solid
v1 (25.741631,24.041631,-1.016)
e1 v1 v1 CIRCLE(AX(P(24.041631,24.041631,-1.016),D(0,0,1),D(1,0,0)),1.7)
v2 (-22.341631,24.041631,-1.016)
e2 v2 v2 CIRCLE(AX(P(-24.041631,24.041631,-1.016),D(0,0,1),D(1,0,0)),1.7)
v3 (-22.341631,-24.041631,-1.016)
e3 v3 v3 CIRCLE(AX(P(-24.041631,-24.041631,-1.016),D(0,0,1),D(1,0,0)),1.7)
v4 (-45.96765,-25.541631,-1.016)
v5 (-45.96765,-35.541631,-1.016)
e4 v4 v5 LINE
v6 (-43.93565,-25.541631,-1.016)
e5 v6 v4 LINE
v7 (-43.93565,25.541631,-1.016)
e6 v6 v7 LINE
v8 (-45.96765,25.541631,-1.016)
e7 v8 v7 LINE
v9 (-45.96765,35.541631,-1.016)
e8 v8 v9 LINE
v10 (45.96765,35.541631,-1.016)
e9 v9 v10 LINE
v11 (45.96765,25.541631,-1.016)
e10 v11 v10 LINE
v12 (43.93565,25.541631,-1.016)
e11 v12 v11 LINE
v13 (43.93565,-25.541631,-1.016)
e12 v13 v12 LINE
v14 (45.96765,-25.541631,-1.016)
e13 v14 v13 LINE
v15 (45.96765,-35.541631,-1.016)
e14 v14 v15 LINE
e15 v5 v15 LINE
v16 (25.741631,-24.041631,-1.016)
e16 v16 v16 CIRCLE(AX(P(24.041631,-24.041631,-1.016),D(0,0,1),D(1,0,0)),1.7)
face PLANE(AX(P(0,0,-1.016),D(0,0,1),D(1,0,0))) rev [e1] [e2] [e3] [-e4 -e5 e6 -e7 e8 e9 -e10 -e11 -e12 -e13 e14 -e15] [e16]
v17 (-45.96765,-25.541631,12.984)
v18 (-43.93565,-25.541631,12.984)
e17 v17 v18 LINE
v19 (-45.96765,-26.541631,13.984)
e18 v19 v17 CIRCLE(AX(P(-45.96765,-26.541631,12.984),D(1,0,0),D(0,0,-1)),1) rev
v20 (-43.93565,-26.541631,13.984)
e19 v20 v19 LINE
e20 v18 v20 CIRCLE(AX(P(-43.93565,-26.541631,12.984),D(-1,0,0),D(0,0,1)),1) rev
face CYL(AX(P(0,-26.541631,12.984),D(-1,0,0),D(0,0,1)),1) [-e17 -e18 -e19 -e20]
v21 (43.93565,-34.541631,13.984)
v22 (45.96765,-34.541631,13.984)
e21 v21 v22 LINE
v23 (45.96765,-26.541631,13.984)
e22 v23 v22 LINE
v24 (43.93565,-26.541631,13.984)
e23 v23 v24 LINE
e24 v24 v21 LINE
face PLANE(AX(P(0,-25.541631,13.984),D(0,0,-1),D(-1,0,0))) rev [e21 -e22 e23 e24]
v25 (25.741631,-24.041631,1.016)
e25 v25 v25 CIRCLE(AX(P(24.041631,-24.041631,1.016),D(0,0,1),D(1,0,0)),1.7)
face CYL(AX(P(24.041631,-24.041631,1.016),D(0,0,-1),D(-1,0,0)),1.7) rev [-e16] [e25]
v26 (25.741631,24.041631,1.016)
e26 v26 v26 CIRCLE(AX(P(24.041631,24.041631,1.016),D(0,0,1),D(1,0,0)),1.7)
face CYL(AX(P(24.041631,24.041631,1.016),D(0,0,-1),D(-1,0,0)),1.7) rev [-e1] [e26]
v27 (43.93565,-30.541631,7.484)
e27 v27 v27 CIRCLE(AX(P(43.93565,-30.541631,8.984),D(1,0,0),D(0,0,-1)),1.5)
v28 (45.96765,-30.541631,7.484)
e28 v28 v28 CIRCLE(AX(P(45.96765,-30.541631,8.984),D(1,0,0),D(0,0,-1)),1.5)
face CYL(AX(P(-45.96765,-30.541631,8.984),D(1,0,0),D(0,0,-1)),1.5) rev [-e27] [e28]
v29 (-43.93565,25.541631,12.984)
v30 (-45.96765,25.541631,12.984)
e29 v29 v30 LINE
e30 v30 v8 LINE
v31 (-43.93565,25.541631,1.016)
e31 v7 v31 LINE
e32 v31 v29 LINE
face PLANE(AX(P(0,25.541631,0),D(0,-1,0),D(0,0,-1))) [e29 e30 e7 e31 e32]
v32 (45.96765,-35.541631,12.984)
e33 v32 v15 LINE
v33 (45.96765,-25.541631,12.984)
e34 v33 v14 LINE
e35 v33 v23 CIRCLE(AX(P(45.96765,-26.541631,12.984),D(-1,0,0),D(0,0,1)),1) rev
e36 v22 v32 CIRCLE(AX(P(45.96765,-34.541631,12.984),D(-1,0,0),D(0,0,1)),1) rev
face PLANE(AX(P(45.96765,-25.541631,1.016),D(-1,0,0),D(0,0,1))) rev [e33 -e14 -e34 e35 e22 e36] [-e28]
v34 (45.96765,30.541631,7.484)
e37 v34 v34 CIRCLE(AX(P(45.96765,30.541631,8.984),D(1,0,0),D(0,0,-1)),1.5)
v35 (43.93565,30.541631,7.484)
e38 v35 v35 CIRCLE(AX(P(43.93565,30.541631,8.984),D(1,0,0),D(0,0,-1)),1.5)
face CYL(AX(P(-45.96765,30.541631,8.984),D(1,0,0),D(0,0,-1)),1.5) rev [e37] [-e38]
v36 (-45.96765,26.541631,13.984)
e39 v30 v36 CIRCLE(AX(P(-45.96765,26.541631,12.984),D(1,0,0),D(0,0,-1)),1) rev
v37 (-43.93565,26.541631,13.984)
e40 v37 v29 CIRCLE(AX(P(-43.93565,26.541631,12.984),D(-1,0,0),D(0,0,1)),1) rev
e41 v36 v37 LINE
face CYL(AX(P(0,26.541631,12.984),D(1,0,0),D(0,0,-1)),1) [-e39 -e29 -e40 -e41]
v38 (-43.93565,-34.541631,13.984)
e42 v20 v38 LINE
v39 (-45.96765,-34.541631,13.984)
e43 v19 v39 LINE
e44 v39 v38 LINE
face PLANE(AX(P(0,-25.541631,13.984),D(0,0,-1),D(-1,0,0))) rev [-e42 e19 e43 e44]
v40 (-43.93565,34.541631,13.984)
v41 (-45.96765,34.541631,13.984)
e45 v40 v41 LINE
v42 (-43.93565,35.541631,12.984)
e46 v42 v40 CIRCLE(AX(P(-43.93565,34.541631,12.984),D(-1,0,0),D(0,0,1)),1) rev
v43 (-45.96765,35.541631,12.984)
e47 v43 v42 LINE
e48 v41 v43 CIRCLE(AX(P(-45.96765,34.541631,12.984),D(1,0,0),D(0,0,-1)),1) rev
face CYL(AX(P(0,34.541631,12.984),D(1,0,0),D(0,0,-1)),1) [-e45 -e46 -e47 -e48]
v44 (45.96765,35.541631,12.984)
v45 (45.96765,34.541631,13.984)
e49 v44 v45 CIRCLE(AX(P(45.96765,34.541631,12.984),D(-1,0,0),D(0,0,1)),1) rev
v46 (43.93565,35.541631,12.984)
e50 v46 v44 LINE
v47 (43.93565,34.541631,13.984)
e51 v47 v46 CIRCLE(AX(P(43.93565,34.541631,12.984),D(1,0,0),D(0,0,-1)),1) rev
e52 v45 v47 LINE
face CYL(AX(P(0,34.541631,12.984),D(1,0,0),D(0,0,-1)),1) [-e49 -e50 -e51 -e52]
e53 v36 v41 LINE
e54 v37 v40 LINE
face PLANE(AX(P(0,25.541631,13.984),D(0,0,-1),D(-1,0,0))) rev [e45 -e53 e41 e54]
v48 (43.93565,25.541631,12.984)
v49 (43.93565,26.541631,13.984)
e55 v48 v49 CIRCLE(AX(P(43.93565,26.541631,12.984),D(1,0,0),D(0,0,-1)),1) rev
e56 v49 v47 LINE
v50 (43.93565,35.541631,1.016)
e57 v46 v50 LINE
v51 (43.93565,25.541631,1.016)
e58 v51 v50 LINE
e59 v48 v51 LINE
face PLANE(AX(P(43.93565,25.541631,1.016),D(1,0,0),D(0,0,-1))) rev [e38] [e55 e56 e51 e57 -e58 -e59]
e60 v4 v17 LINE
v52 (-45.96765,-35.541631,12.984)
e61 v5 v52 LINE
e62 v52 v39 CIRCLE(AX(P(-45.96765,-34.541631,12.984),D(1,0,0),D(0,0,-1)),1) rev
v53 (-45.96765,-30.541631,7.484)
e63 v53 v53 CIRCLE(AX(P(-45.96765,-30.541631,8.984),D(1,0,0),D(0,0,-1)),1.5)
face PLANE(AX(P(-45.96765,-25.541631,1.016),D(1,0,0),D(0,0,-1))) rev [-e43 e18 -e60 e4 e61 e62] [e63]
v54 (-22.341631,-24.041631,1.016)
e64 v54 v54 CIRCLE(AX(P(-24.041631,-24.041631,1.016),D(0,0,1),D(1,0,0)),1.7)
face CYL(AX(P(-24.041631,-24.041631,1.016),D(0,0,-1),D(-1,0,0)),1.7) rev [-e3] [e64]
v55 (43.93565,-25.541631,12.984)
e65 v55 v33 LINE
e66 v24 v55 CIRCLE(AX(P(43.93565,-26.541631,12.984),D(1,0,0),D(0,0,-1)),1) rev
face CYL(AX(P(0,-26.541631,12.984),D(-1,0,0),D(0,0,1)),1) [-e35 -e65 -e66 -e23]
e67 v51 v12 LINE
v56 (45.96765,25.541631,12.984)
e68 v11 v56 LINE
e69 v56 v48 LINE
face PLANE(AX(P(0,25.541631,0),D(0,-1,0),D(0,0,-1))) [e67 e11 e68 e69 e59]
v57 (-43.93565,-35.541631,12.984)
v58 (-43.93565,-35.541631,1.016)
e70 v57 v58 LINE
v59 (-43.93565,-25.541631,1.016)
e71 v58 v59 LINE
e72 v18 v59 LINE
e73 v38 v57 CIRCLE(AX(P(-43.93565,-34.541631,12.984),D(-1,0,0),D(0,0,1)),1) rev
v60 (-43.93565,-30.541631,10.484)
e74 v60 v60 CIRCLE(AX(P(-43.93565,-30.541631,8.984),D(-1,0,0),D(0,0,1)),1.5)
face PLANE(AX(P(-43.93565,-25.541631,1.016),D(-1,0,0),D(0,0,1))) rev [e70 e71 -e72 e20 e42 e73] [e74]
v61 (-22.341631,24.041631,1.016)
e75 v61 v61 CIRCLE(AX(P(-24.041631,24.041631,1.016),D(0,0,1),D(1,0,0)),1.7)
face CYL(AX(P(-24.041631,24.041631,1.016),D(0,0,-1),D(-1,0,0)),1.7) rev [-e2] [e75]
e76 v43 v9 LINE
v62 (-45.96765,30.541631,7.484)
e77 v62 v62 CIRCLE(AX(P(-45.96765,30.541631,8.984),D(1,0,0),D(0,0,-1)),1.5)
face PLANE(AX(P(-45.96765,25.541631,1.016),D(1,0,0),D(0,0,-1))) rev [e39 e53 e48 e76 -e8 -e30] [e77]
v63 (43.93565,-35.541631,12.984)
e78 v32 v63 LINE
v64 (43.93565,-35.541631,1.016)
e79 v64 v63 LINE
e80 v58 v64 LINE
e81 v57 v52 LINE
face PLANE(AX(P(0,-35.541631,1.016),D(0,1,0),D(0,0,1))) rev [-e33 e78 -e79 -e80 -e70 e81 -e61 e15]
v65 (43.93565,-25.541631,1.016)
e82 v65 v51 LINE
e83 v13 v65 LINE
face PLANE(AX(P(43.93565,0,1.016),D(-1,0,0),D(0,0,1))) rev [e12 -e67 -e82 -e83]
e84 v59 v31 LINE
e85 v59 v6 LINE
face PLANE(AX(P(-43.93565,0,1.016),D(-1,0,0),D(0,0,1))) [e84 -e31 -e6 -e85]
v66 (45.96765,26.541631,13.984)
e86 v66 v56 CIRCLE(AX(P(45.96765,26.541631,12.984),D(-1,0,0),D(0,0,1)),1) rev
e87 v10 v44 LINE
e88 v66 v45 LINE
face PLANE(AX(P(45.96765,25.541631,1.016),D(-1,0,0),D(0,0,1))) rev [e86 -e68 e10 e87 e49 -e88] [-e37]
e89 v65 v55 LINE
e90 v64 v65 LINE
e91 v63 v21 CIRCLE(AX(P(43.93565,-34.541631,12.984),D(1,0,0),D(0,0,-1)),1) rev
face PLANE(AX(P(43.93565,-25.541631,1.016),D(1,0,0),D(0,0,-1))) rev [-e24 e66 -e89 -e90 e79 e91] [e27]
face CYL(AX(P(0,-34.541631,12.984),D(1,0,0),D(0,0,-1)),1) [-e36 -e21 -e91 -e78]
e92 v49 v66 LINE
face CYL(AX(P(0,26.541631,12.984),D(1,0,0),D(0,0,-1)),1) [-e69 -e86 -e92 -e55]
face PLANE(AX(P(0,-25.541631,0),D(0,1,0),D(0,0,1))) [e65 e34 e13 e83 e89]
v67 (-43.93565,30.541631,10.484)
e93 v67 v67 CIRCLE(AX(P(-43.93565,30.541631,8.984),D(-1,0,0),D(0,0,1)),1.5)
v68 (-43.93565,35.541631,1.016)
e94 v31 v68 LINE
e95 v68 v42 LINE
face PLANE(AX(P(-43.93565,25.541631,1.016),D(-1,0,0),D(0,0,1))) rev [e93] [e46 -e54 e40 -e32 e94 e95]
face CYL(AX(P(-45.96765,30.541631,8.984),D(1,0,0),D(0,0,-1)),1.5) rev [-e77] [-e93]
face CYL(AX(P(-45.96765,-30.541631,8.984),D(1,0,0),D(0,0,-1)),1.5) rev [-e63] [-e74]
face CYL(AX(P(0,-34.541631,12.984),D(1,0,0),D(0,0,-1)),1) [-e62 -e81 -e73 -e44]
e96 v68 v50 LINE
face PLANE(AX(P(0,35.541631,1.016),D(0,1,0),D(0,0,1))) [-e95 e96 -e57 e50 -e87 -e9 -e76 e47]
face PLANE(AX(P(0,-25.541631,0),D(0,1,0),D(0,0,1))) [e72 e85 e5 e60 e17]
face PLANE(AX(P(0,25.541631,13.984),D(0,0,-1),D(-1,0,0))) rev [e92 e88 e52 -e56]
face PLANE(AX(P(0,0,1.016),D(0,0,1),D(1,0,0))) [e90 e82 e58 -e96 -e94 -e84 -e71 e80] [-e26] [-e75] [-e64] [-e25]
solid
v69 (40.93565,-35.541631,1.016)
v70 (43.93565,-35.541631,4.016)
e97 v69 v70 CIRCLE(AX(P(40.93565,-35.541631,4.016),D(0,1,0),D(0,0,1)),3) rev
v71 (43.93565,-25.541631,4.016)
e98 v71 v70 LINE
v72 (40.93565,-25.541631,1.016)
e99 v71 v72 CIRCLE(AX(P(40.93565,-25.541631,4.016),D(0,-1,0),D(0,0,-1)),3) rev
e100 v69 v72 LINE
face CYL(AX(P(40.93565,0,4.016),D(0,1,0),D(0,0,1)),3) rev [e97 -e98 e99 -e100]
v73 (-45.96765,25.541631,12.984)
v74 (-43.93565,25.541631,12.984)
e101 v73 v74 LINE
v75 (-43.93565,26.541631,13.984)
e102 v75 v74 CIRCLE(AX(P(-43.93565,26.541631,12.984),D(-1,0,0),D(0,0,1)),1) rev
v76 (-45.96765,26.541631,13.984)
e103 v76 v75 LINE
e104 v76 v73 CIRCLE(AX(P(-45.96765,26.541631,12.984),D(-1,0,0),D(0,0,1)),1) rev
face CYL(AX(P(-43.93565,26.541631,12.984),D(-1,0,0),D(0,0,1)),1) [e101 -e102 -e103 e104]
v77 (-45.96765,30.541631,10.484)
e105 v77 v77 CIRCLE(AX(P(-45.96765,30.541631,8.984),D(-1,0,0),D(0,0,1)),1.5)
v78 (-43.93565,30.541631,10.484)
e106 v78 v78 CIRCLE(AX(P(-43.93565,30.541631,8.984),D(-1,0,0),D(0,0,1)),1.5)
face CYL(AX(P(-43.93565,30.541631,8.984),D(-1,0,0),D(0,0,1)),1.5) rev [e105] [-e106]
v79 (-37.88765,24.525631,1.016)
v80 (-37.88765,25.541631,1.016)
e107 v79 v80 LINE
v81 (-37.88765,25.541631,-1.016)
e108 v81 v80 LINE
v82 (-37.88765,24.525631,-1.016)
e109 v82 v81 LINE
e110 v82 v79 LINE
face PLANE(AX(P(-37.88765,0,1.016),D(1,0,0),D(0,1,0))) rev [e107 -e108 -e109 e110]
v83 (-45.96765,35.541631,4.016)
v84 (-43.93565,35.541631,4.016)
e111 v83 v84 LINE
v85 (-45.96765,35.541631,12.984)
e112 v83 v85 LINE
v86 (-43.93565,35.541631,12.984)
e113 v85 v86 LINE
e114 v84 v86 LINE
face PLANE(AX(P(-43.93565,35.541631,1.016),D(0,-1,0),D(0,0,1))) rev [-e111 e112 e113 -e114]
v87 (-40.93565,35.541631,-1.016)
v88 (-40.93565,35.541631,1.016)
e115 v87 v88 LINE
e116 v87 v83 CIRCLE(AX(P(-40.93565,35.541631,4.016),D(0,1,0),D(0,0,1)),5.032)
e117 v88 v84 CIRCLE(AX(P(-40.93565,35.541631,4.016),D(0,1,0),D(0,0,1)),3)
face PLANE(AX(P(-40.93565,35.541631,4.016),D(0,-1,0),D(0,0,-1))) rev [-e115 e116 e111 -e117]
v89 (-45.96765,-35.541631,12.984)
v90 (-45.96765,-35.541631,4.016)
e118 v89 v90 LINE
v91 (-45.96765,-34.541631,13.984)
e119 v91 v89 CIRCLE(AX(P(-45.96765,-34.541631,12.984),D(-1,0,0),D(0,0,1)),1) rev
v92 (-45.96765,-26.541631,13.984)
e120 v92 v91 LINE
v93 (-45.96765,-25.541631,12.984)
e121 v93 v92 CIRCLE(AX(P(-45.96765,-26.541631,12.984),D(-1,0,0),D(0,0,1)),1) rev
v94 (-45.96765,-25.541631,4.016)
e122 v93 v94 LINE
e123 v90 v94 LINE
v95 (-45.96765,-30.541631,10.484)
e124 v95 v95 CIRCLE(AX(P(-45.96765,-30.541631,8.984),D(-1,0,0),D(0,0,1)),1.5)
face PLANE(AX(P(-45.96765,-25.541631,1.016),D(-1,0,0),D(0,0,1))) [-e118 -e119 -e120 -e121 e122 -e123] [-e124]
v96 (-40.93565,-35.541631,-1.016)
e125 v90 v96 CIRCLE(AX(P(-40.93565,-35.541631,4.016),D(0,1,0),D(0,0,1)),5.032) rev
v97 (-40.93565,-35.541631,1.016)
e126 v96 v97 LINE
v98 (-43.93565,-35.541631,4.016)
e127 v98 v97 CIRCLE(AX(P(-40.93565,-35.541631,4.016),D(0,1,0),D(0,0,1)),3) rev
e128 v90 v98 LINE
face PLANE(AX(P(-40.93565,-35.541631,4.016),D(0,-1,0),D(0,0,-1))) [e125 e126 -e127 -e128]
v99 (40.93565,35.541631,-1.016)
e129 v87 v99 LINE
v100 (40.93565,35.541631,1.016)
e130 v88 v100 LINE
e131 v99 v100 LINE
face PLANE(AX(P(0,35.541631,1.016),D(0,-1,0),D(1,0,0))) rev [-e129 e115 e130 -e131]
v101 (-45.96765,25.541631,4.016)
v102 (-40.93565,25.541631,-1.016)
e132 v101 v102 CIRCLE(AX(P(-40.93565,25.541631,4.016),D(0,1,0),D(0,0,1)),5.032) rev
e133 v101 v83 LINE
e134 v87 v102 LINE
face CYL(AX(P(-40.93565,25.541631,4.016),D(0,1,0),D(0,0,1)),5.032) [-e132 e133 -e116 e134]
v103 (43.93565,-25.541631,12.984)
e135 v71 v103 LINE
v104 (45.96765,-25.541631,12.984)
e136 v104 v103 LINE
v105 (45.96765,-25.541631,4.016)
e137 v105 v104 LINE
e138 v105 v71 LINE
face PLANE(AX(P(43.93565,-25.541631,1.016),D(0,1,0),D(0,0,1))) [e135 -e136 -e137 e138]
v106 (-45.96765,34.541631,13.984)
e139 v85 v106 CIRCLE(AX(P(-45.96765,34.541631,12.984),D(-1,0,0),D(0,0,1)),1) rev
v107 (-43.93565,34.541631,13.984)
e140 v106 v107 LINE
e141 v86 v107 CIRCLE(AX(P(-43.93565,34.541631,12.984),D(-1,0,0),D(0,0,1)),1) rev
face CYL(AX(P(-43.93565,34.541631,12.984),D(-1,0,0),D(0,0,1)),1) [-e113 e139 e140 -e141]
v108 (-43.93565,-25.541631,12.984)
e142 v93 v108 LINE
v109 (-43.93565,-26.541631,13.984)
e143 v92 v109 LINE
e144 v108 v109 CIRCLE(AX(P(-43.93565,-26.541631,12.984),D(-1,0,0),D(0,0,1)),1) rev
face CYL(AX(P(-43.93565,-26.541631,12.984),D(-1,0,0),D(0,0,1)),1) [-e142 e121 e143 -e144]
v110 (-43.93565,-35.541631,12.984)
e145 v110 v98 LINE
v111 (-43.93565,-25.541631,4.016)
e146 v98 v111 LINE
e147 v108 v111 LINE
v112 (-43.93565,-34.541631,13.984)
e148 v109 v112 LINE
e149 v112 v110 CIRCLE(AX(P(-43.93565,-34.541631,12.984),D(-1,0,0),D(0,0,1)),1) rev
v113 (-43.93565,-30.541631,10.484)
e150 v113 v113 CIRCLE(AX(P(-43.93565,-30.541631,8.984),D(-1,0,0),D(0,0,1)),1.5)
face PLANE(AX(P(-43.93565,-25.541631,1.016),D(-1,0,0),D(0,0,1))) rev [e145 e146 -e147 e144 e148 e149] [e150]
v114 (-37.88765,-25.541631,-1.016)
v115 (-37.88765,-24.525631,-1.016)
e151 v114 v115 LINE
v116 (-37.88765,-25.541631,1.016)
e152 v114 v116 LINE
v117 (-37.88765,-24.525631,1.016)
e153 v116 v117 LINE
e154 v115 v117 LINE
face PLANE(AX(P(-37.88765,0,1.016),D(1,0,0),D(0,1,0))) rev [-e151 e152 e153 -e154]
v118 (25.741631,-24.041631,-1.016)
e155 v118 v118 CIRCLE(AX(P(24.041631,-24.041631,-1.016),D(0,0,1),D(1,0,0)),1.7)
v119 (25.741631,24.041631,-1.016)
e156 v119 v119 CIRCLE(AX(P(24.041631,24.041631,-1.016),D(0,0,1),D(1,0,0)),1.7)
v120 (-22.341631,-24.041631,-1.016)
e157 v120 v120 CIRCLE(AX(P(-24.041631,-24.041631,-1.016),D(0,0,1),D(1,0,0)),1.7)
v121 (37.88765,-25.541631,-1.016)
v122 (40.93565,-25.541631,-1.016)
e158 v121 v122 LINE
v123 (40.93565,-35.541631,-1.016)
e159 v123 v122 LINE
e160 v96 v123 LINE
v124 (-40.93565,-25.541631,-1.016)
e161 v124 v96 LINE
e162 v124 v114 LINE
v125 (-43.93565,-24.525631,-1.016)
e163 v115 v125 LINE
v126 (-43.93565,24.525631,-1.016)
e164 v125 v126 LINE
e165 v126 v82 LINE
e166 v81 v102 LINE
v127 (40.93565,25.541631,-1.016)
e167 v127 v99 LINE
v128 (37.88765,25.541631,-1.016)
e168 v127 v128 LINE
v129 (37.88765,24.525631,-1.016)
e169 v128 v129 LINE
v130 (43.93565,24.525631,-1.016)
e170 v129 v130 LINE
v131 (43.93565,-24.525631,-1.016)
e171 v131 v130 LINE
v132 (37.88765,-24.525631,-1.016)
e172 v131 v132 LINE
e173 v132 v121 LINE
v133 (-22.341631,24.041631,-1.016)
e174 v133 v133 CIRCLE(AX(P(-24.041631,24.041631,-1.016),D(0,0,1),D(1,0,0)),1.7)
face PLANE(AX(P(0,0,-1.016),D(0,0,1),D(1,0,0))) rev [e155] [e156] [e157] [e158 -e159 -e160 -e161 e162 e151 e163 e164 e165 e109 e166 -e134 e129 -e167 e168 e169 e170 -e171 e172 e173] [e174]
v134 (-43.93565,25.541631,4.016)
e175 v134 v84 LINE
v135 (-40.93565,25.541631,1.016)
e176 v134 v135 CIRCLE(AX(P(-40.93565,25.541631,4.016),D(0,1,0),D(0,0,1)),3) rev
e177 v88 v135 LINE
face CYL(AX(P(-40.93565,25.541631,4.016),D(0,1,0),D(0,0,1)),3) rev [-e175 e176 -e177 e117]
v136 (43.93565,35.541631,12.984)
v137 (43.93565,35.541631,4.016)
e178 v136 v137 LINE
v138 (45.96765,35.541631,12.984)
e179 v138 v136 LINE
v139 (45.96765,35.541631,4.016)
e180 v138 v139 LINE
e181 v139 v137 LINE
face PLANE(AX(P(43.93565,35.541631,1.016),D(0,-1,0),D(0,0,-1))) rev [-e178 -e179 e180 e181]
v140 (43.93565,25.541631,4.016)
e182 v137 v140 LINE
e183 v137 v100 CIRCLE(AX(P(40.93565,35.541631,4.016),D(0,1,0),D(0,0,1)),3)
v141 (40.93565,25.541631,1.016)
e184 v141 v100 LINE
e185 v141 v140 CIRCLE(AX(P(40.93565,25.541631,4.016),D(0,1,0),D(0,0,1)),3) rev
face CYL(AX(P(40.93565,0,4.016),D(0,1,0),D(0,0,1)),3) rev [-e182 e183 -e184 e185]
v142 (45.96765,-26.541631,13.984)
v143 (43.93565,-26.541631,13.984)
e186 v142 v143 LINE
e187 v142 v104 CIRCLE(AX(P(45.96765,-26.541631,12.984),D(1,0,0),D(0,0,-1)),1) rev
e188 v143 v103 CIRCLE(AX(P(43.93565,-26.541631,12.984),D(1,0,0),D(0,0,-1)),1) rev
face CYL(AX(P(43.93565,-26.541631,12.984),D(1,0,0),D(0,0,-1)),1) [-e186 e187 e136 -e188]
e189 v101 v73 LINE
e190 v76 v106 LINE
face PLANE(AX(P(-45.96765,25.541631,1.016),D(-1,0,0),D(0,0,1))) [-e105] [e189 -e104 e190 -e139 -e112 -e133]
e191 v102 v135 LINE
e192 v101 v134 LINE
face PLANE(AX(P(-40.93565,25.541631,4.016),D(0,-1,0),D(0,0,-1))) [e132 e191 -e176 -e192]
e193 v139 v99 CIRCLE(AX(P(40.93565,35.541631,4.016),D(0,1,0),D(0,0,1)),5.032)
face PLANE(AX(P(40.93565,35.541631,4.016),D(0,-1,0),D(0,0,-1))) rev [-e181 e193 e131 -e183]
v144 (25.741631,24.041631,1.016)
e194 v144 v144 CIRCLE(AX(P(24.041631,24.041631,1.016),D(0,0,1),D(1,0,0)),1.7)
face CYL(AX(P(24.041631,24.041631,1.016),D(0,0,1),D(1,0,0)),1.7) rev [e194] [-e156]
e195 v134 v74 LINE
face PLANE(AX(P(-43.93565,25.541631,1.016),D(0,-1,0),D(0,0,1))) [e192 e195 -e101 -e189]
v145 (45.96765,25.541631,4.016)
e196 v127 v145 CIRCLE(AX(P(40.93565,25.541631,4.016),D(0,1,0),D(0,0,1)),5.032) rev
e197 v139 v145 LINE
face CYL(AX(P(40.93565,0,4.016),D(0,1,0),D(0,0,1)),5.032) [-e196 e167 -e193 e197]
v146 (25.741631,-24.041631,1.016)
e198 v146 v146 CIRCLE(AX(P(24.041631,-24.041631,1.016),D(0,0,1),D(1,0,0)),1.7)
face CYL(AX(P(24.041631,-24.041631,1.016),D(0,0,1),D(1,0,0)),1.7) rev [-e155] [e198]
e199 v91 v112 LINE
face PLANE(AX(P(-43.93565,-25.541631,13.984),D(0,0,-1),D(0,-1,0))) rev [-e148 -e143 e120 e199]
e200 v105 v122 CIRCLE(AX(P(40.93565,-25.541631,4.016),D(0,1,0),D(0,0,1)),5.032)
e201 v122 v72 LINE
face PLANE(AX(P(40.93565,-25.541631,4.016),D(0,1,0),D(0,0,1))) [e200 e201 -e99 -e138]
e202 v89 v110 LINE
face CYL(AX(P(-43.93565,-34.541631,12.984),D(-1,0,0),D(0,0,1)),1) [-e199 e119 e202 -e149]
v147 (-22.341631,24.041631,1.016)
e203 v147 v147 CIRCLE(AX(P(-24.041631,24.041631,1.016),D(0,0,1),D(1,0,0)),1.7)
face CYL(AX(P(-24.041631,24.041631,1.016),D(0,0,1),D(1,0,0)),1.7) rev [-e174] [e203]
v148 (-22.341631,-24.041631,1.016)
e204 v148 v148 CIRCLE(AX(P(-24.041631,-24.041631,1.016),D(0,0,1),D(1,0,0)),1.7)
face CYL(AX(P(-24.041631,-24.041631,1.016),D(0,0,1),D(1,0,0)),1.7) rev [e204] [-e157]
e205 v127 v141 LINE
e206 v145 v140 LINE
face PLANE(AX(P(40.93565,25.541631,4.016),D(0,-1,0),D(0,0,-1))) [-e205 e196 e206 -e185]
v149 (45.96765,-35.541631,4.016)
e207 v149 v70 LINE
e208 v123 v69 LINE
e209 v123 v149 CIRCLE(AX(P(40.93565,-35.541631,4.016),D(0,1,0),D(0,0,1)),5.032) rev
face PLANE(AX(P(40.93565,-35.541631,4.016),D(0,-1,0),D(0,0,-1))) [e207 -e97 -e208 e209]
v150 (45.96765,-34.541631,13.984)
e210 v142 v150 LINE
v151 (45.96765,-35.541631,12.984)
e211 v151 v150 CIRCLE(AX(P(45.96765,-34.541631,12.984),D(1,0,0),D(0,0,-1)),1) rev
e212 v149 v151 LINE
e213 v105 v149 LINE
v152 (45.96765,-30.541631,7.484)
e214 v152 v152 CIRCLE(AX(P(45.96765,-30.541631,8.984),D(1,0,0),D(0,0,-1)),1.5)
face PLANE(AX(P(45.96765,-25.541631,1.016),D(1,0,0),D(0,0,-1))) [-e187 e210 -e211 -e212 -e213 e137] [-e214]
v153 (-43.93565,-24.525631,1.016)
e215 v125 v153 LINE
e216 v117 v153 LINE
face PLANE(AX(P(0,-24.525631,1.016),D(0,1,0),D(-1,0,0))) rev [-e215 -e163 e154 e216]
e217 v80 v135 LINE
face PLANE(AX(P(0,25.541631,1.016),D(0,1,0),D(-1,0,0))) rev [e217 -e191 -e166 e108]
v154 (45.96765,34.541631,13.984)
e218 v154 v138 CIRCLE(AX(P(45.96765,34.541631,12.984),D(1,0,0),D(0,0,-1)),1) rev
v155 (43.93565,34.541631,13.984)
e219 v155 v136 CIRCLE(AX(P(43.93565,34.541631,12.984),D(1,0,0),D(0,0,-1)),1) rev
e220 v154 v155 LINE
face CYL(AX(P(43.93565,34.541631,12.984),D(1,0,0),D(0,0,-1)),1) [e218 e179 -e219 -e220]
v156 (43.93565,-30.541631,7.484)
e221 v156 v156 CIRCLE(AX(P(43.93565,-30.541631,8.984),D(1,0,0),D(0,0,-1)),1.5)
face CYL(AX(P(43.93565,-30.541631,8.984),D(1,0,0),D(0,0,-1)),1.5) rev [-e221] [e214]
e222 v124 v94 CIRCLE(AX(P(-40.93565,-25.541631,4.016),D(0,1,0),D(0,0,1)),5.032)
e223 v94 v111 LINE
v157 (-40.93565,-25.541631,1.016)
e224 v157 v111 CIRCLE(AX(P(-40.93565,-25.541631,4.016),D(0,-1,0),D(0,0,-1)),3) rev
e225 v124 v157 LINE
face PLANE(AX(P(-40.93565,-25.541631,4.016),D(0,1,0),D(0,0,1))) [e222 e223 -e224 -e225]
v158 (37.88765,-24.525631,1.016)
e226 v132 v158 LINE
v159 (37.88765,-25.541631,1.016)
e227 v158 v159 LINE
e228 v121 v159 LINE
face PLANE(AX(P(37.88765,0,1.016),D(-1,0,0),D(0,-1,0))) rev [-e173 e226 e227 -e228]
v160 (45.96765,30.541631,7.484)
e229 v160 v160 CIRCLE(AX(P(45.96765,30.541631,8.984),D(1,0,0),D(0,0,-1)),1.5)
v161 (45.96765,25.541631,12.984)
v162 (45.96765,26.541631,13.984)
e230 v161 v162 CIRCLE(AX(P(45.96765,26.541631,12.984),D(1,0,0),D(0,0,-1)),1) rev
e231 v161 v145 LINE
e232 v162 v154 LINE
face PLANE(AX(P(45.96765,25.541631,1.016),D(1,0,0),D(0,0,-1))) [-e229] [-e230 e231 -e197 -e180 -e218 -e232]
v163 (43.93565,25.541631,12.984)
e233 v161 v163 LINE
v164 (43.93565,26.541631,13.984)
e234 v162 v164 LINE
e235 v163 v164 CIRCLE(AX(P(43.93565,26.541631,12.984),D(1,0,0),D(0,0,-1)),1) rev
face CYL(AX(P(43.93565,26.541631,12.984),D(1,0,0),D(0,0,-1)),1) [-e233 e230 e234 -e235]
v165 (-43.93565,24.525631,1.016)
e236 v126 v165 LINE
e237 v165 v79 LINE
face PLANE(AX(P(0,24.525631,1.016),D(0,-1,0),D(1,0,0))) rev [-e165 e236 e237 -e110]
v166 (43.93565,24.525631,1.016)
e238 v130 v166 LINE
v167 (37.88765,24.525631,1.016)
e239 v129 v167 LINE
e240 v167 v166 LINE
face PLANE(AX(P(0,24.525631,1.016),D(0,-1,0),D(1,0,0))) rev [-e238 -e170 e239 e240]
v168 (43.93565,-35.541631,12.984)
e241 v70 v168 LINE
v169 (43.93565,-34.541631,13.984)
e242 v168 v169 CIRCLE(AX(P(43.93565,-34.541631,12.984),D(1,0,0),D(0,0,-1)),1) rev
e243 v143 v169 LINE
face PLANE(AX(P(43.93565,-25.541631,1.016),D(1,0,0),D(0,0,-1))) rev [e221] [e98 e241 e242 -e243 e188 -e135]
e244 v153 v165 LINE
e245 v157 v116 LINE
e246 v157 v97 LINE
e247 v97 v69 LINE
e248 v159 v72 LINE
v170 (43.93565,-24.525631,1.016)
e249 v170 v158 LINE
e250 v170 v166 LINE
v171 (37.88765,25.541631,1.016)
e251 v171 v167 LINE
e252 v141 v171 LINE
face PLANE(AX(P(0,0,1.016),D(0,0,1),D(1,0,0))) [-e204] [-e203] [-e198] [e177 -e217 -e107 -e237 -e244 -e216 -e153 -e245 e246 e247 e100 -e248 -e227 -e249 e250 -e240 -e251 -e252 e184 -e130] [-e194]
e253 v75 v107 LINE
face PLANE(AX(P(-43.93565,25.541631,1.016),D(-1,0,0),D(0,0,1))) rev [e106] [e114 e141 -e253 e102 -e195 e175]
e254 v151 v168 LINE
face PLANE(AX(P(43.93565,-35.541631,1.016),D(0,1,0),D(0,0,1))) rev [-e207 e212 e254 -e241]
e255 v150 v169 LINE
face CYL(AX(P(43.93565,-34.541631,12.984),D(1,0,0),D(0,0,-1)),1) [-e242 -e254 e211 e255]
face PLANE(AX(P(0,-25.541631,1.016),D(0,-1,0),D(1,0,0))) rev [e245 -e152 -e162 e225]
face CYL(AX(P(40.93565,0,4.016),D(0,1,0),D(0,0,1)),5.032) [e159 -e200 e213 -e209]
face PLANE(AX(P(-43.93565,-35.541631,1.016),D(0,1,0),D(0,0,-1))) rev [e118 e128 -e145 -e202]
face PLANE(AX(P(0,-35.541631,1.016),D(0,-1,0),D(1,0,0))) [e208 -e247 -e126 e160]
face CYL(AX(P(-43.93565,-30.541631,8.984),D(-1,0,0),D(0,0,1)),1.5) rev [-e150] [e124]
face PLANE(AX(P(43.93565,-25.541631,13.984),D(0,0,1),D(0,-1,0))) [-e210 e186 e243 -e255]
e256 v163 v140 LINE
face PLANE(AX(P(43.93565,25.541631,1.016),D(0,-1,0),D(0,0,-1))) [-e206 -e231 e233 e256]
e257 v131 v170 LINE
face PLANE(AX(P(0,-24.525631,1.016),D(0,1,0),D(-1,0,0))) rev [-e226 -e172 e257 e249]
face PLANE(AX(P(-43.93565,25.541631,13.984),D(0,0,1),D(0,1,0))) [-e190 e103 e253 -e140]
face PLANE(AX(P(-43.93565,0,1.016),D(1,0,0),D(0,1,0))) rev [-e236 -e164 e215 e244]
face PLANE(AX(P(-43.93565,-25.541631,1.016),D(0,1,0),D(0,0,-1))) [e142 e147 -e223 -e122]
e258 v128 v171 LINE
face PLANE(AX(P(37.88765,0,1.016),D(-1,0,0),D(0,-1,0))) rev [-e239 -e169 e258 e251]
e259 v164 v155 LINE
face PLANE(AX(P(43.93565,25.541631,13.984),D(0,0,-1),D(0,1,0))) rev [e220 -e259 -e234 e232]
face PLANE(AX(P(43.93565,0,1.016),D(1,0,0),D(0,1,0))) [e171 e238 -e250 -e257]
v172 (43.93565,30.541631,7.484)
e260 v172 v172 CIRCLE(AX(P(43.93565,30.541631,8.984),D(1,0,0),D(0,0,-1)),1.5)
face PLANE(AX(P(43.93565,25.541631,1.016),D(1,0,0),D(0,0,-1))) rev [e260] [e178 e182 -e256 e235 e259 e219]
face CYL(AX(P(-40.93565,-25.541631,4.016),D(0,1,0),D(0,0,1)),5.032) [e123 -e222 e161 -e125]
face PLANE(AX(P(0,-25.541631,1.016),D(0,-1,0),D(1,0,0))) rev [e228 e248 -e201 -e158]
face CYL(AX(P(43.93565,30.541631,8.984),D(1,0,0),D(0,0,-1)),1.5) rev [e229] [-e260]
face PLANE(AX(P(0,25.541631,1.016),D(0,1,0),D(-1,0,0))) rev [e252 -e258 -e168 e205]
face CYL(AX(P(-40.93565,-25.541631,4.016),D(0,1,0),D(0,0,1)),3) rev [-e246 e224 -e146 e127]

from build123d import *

# Parameters (mm, degrees)
SKETCH1_W                  = 87.8713
SKETCH1_H                  = 71.08326112
SKETCH1_R                  = 1.7
BOSS_EXTRUDE1_DEPTH        = 1.016
BOSS_EXTRUDE2_START        = 35.541631
SKETCH2_W                  = 2.032
SKETCH2_H                  = 15
BOSS_EXTRUDE2_DEPTH        = 10
BOSS_EXTRUDE3_START        = -35.541631
SKETCH2_2_W                = 2.032
SKETCH2_2_H                = 15
BOSS_EXTRUDE3_DEPTH        = 10
CUT_EXTRUDE1_DEPTH         = 60.764409448
CUT_EXTRUDE1_DEPTH_BACK    = 60.764409448
SKETCH3_R                  = 1.5
FILLET2_R                  = 1
CONVERT_SOLID3_START       = -43.93565
CONVERT_SOLID3_OUTLINE_W   = 10
CONVERT_SOLID3_OUTLINE_H   = 2.032
CONVERT_SOLID3_OUTLINE_W_2 = 49.05126112
CONVERT_SOLID3_DEPTH       = 87.8713
CONVERT_SOLID3_START_2     = -45.96765
CONVERT_SOLID3_2_OUTLINE_R = 1.5
CONVERT_SOLID3_2_DEPTH     = 5.032
CONVERT_SOLID3_START_3     = 40.93565
CONVERT_SOLID3_3_OUTLINE_R = 1.5
CONVERT_SOLID3_3_DEPTH     = 5.032
CONVERT_SOLID3_START_4     = -37.88765
CONVERT_SOLID3_4_OUTLINE_W = 1.016
CONVERT_SOLID3_4_OUTLINE_H = 2.032
CONVERT_SOLID3_4_DEPTH     = 75.7753
CONVERT_SOLID3_START_5     = -2
CONVERT_SOLID3_5_OUTLINE_R = 1.7
CONVERT_SOLID3_5_DEPTH     = 4
CONVERT_SOLID3_START_6     = -35.54163056
CONVERT_SOLID3_6_DEPTH     = 71.08326112
CONVERT_SOLID3_7_DEPTH     = 10
CONVERT_SOLID3_START_7     = 25.54163056
CONVERT_SOLID3_8_DEPTH     = 10


with BuildPart() as part:
    # Sketch1 → Boss-Extrude1 (new, symmetric)
    # profile 1 of 2: a face of its own
    with BuildSketch(Plane.XY):
        Rectangle(SKETCH1_W, SKETCH1_H)
        with BuildLine():
            ThreePointArc((18.424323487, 27.37780678), (0, 33), (-18.424323487, 27.37780678))
            ThreePointArc((-18.424323487, 27.37780678), (-20.638820721, 26.559371584), (-22.981976969, 26.848253846))
            ThreePointArc((-22.981976969, 26.848253846), (-26.162950904, 26.162950904), (-26.848253846, 22.981976969))
            ThreePointArc((-26.848253846, 22.981976969), (-26.559371584, 20.638820721), (-27.37780678, 18.424323487))
            ThreePointArc((-27.37780678, 18.424323487), (-33, 0), (-27.37780678, -18.424323487))
            ThreePointArc((-27.37780678, -18.424323487), (-26.559371584, -20.638820721), (-26.848253846, -22.981976969))
            ThreePointArc((-26.848253846, -22.981976969), (-26.162950904, -26.162950904), (-22.981976969, -26.848253846))
            ThreePointArc((-22.981976969, -26.848253846), (-20.638820721, -26.559371584), (-18.424323487, -27.37780678))
            ThreePointArc((-18.424323487, -27.37780678), (0, -33), (18.424323487, -27.37780678))
            ThreePointArc((18.424323487, -27.37780678), (20.638820721, -26.559371584), (22.981976969, -26.848253846))
            ThreePointArc((22.981976969, -26.848253846), (26.162950904, -26.162950904), (26.848253846, -22.981976969))
            ThreePointArc((26.848253846, -22.981976969), (26.559371584, -20.638820721), (27.37780678, -18.424323487))
            ThreePointArc((27.37780678, -18.424323487), (33, 0), (27.37780678, 18.424323487))
            ThreePointArc((27.37780678, 18.424323487), (26.559371584, 20.638820721), (26.848253846, 22.981976969))
            ThreePointArc((26.848253846, 22.981976969), (26.162950904, 26.162950904), (22.981976969, 26.848253846))
            ThreePointArc((22.981976969, 26.848253846), (20.638820721, 26.559371584), (18.424323487, 27.37780678))
        make_face(mode=Mode.SUBTRACT)
    # profile 2 of 2: a face of its own
    with BuildSketch(Plane.XY):
        with BuildLine():
            ThreePointArc((18.424323487, 27.37780678), (20.638820721, 26.559371584), (22.981976969, 26.848253846))
            ThreePointArc((22.981976969, 26.848253846), (26.162950904, 26.162950904), (26.848253846, 22.981976969))
            ThreePointArc((26.848253846, 22.981976969), (26.559371584, 20.638820721), (27.37780678, 18.424323487))
            ThreePointArc((27.37780678, 18.424323487), (33, 0), (27.37780678, -18.424323487))
            ThreePointArc((27.37780678, -18.424323487), (26.559371584, -20.638820721), (26.848253846, -22.981976969))
            ThreePointArc((26.848253846, -22.981976969), (26.162950904, -26.162950904), (22.981976969, -26.848253846))
            ThreePointArc((22.981976969, -26.848253846), (20.638820721, -26.559371584), (18.424323487, -27.37780678))
            ThreePointArc((18.424323487, -27.37780678), (0, -33), (-18.424323487, -27.37780678))
            ThreePointArc((-18.424323487, -27.37780678), (-20.638820721, -26.559371584), (-22.981976969, -26.848253846))
            ThreePointArc((-22.981976969, -26.848253846), (-26.162950904, -26.162950904), (-26.848253846, -22.981976969))
            ThreePointArc((-26.848253846, -22.981976969), (-26.559371584, -20.638820721), (-27.37780678, -18.424323487))
            ThreePointArc((-27.37780678, -18.424323487), (-33, 0), (-27.37780678, 18.424323487))
            ThreePointArc((-27.37780678, 18.424323487), (-26.559371584, 20.638820721), (-26.848253846, 22.981976969))
            ThreePointArc((-26.848253846, 22.981976969), (-26.162950904, 26.162950904), (-22.981976969, 26.848253846))
            ThreePointArc((-22.981976969, 26.848253846), (-20.638820721, 26.559371584), (-18.424323487, 27.37780678))
            ThreePointArc((-18.424323487, 27.37780678), (0, 33), (18.424323487, 27.37780678))
        make_face()
        with Locations((-24.04163056, -24.04163056)):
            Circle(SKETCH1_R, mode=Mode.SUBTRACT)
        with Locations((24.04163056, -24.04163056)):
            Circle(SKETCH1_R, mode=Mode.SUBTRACT)
        with Locations((24.04163056, 24.04163056)):
            Circle(SKETCH1_R, mode=Mode.SUBTRACT)
        with Locations((-24.04163056, 24.04163056)):
            Circle(SKETCH1_R, mode=Mode.SUBTRACT)
    extrude(amount=BOSS_EXTRUDE1_DEPTH, both=True)

    # Sketch2 → Boss-Extrude2 (add)
    with BuildSketch(Plane(origin=(0, 0, 0), x_dir=(1, 0, 0), z_dir=(0, 1, 0)).offset(BOSS_EXTRUDE2_START)):
        with Locations((-44.95165, -6.484)):
            Rectangle(SKETCH2_W, SKETCH2_H)
        with Locations((44.95165, -6.484)):
            Rectangle(SKETCH2_W, SKETCH2_H)
    extrude(amount=-BOSS_EXTRUDE2_DEPTH)

    # Sketch2<2> → Boss-Extrude3 (add)
    with BuildSketch(Plane(origin=(0, 0, 0), x_dir=(1, 0, 0), z_dir=(0, 1, 0)).offset(BOSS_EXTRUDE3_START)):
        with Locations((-44.95165, -6.484)):
            Rectangle(SKETCH2_2_W, SKETCH2_2_H)
        with Locations((44.95165, -6.484)):
            Rectangle(SKETCH2_2_W, SKETCH2_2_H)
    extrude(amount=BOSS_EXTRUDE3_DEPTH)

    # Sketch3 → Cut-Extrude1 (cut, two sides: drawn at the far end of the back side and taken through both)
    with BuildSketch(Plane(origin=(0, 0, 0), x_dir=(0, 0, -1), z_dir=(1, 0, 0)).offset(-CUT_EXTRUDE1_DEPTH_BACK)):
        with Locations((-8.984, 30.54163056)):
            Circle(SKETCH3_R)
        with Locations((-8.984, -30.54163056)):
            Circle(SKETCH3_R)
    extrude(amount=CUT_EXTRUDE1_DEPTH + CUT_EXTRUDE1_DEPTH_BACK, mode=Mode.SUBTRACT)

    # Fillet2
    fillet2_edges = [part.edges().sort_by_distance(p)[0] for p in [
        (-44.95165, 35.541631, 13.984),
        (-44.95165, 25.541631, 13.984),
        (44.95165, 35.541631, 13.984),
        (44.95165, 25.541631, 13.984),
        (-44.95165, -35.541631, 13.984),
        (-44.95165, -25.541631, 13.984),
        (44.95165, -35.541631, 13.984),
        (44.95165, -25.541631, 13.984),
    ]]
    fillet(fillet2_edges, radius=FILLET2_R)


with BuildPart() as body_2:
    # Convert-Solid3: read off the stored shape, not the designer's step
    # Convert-Solid3 outline → Convert-Solid3 (new body)
    with BuildSketch(Plane.YZ.offset(CONVERT_SOLID3_START)):
        with Locations((-30.54163056, 0)):
            Rectangle(CONVERT_SOLID3_OUTLINE_W, CONVERT_SOLID3_OUTLINE_H)
        Rectangle(CONVERT_SOLID3_OUTLINE_W_2, CONVERT_SOLID3_OUTLINE_H)
        with Locations((30.54163056, 0)):
            Rectangle(CONVERT_SOLID3_OUTLINE_W, CONVERT_SOLID3_OUTLINE_H)
    extrude(amount=CONVERT_SOLID3_DEPTH)

    # Convert-Solid3 2 outline → Convert-Solid3 2 (add)
    # profile 1 of 2: a face of its own
    with BuildSketch(Plane.YZ.offset(CONVERT_SOLID3_START_2)):
        with BuildLine():
            Line((-35.54163056, -1.016), (-25.54163056, -1.016))
            Line((-25.54163056, -1.016), (-25.54163056, 12.984))
            ThreePointArc((-25.54163056, 12.984), (-25.834523779, 13.691106781), (-26.54163056, 13.984))
            Line((-26.54163056, 13.984), (-34.54163056, 13.984))
            ThreePointArc((-34.54163056, 13.984), (-35.248737342, 13.691106781), (-35.54163056, 12.984))
            Line((-35.54163056, 12.984), (-35.54163056, -1.016))
        make_face()
        with Locations((-30.54163056, 8.984)):
            Circle(CONVERT_SOLID3_2_OUTLINE_R, mode=Mode.SUBTRACT)
    # profile 2 of 2: a face of its own
    with BuildSketch(Plane.YZ.offset(CONVERT_SOLID3_START_2)):
        with BuildLine():
            Line((35.54163056, -1.016), (35.54163056, 12.984))
            ThreePointArc((35.54163056, 12.984), (35.248737342, 13.691106781), (34.54163056, 13.984))
            Line((34.54163056, 13.984), (26.54163056, 13.984))
            ThreePointArc((26.54163056, 13.984), (25.834523779, 13.691106781), (25.54163056, 12.984))
            Line((25.54163056, 12.984), (25.54163056, -1.016))
            Line((25.54163056, -1.016), (35.54163056, -1.016))
        make_face()
        with Locations((30.54163056, 8.984)):
            Circle(CONVERT_SOLID3_2_OUTLINE_R, mode=Mode.SUBTRACT)
    extrude(amount=CONVERT_SOLID3_2_DEPTH)

    # Convert-Solid3 3 outline → Convert-Solid3 3 (add)
    # profile 1 of 2: a face of its own
    with BuildSketch(Plane.YZ.offset(CONVERT_SOLID3_START_3)):
        with BuildLine():
            Line((-35.54163056, -1.016), (-25.54163056, -1.016))
            Line((-25.54163056, -1.016), (-25.54163056, 12.984))
            ThreePointArc((-25.54163056, 12.984), (-25.834523779, 13.691106781), (-26.54163056, 13.984))
            Line((-26.54163056, 13.984), (-34.54163056, 13.984))
            ThreePointArc((-34.54163056, 13.984), (-35.248737342, 13.691106781), (-35.54163056, 12.984))
            Line((-35.54163056, 12.984), (-35.54163056, -1.016))
        make_face()
        with Locations((-30.54163056, 8.984)):
            Circle(CONVERT_SOLID3_3_OUTLINE_R, mode=Mode.SUBTRACT)
    # profile 2 of 2: a face of its own
    with BuildSketch(Plane.YZ.offset(CONVERT_SOLID3_START_3)):
        with BuildLine():
            Line((35.54163056, -1.016), (35.54163056, 12.984))
            ThreePointArc((35.54163056, 12.984), (35.248737342, 13.691106781), (34.54163056, 13.984))
            Line((34.54163056, 13.984), (26.54163056, 13.984))
            ThreePointArc((26.54163056, 13.984), (25.834523779, 13.691106781), (25.54163056, 12.984))
            Line((25.54163056, 12.984), (25.54163056, -1.016))
            Line((25.54163056, -1.016), (35.54163056, -1.016))
        make_face()
        with Locations((30.54163056, 8.984)):
            Circle(CONVERT_SOLID3_3_OUTLINE_R, mode=Mode.SUBTRACT)
    extrude(amount=CONVERT_SOLID3_3_DEPTH)

    # Convert-Solid3 4 outline → Convert-Solid3 4 (add)
    with BuildSketch(Plane.YZ.offset(CONVERT_SOLID3_START_4)):
        with Locations((-25.03363056, 0)):
            Rectangle(CONVERT_SOLID3_4_OUTLINE_W, CONVERT_SOLID3_4_OUTLINE_H)
        with Locations((25.03363056, 0)):
            Rectangle(CONVERT_SOLID3_4_OUTLINE_W, CONVERT_SOLID3_4_OUTLINE_H)
    extrude(amount=CONVERT_SOLID3_4_DEPTH)

    # Convert-Solid3 5 outline → Convert-Solid3 5 (cut)
    with BuildSketch(Plane.XY.offset(CONVERT_SOLID3_START_5)):
        with Locations((-24.04163056, -24.04163056)):
            Circle(CONVERT_SOLID3_5_OUTLINE_R)
        with Locations((24.04163056, -24.04163056)):
            Circle(CONVERT_SOLID3_5_OUTLINE_R)
        with Locations((24.04163056, 24.04163056)):
            Circle(CONVERT_SOLID3_5_OUTLINE_R)
        with Locations((-24.04163056, 24.04163056)):
            Circle(CONVERT_SOLID3_5_OUTLINE_R)
    extrude(amount=CONVERT_SOLID3_5_DEPTH, mode=Mode.SUBTRACT)

    # Convert-Solid3 6 outline → Convert-Solid3 6 (cut)
    with BuildSketch(Plane(origin=(0, 0, 0), x_dir=(1, 0, 0), z_dir=(0, 1, 0)).offset(CONVERT_SOLID3_START_6)):
        with BuildLine():
            Line((40.93565, -13.984), (43.93565, -13.984))
            Line((43.93565, -13.984), (43.93565, -4.016))
            ThreePointArc((43.93565, -4.016), (43.056970344, -1.894679656), (40.93565, -1.016))
            Line((40.93565, -1.016), (40.93565, -13.984))
        make_face()
        with BuildLine():
            Line((-40.93565, -13.984), (-40.93565, -1.016))
            ThreePointArc((-40.93565, -1.016), (-43.056970344, -1.894679656), (-43.93565, -4.016))
            Line((-43.93565, -4.016), (-43.93565, -13.984))
            Line((-43.93565, -13.984), (-40.93565, -13.984))
        make_face()
    extrude(amount=CONVERT_SOLID3_6_DEPTH, mode=Mode.SUBTRACT)

    # Convert-Solid3 7 outline → Convert-Solid3 7 (cut)
    with BuildSketch(Plane(origin=(0, 0, 0), x_dir=(1, 0, 0), z_dir=(0, 1, 0)).offset(CONVERT_SOLID3_START_6)):
        with BuildLine():
            ThreePointArc((40.93565, 1.016), (44.493811323, -0.457838677), (45.96765, -4.016))
            Line((45.96765, -4.016), (45.96765, 1.016))
            Line((45.96765, 1.016), (40.93565, 1.016))
        make_face()
        with BuildLine():
            ThreePointArc((-45.96765, -4.016), (-44.493811323, -0.457838677), (-40.93565, 1.016))
            Line((-40.93565, 1.016), (-45.96765, 1.016))
            Line((-45.96765, 1.016), (-45.96765, -4.016))
        make_face()
    extrude(amount=CONVERT_SOLID3_7_DEPTH, mode=Mode.SUBTRACT)

    # Convert-Solid3 8 outline → Convert-Solid3 8 (cut)
    with BuildSketch(Plane(origin=(0, 0, 0), x_dir=(1, 0, 0), z_dir=(0, 1, 0)).offset(CONVERT_SOLID3_START_7)):
        with BuildLine():
            ThreePointArc((40.93565, 1.016), (44.493811323, -0.457838677), (45.96765, -4.016))
            Line((45.96765, -4.016), (45.96765, 1.016))
            Line((45.96765, 1.016), (40.93565, 1.016))
        make_face()
        with BuildLine():
            ThreePointArc((-45.96765, -4.016), (-44.493811323, -0.457838677), (-40.93565, 1.016))
            Line((-40.93565, 1.016), (-45.96765, 1.016))
            Line((-45.96765, 1.016), (-45.96765, -4.016))
        make_face()
    extrude(amount=CONVERT_SOLID3_8_DEPTH, mode=Mode.SUBTRACT)


solid = Compound([part.part, body_2.part])
